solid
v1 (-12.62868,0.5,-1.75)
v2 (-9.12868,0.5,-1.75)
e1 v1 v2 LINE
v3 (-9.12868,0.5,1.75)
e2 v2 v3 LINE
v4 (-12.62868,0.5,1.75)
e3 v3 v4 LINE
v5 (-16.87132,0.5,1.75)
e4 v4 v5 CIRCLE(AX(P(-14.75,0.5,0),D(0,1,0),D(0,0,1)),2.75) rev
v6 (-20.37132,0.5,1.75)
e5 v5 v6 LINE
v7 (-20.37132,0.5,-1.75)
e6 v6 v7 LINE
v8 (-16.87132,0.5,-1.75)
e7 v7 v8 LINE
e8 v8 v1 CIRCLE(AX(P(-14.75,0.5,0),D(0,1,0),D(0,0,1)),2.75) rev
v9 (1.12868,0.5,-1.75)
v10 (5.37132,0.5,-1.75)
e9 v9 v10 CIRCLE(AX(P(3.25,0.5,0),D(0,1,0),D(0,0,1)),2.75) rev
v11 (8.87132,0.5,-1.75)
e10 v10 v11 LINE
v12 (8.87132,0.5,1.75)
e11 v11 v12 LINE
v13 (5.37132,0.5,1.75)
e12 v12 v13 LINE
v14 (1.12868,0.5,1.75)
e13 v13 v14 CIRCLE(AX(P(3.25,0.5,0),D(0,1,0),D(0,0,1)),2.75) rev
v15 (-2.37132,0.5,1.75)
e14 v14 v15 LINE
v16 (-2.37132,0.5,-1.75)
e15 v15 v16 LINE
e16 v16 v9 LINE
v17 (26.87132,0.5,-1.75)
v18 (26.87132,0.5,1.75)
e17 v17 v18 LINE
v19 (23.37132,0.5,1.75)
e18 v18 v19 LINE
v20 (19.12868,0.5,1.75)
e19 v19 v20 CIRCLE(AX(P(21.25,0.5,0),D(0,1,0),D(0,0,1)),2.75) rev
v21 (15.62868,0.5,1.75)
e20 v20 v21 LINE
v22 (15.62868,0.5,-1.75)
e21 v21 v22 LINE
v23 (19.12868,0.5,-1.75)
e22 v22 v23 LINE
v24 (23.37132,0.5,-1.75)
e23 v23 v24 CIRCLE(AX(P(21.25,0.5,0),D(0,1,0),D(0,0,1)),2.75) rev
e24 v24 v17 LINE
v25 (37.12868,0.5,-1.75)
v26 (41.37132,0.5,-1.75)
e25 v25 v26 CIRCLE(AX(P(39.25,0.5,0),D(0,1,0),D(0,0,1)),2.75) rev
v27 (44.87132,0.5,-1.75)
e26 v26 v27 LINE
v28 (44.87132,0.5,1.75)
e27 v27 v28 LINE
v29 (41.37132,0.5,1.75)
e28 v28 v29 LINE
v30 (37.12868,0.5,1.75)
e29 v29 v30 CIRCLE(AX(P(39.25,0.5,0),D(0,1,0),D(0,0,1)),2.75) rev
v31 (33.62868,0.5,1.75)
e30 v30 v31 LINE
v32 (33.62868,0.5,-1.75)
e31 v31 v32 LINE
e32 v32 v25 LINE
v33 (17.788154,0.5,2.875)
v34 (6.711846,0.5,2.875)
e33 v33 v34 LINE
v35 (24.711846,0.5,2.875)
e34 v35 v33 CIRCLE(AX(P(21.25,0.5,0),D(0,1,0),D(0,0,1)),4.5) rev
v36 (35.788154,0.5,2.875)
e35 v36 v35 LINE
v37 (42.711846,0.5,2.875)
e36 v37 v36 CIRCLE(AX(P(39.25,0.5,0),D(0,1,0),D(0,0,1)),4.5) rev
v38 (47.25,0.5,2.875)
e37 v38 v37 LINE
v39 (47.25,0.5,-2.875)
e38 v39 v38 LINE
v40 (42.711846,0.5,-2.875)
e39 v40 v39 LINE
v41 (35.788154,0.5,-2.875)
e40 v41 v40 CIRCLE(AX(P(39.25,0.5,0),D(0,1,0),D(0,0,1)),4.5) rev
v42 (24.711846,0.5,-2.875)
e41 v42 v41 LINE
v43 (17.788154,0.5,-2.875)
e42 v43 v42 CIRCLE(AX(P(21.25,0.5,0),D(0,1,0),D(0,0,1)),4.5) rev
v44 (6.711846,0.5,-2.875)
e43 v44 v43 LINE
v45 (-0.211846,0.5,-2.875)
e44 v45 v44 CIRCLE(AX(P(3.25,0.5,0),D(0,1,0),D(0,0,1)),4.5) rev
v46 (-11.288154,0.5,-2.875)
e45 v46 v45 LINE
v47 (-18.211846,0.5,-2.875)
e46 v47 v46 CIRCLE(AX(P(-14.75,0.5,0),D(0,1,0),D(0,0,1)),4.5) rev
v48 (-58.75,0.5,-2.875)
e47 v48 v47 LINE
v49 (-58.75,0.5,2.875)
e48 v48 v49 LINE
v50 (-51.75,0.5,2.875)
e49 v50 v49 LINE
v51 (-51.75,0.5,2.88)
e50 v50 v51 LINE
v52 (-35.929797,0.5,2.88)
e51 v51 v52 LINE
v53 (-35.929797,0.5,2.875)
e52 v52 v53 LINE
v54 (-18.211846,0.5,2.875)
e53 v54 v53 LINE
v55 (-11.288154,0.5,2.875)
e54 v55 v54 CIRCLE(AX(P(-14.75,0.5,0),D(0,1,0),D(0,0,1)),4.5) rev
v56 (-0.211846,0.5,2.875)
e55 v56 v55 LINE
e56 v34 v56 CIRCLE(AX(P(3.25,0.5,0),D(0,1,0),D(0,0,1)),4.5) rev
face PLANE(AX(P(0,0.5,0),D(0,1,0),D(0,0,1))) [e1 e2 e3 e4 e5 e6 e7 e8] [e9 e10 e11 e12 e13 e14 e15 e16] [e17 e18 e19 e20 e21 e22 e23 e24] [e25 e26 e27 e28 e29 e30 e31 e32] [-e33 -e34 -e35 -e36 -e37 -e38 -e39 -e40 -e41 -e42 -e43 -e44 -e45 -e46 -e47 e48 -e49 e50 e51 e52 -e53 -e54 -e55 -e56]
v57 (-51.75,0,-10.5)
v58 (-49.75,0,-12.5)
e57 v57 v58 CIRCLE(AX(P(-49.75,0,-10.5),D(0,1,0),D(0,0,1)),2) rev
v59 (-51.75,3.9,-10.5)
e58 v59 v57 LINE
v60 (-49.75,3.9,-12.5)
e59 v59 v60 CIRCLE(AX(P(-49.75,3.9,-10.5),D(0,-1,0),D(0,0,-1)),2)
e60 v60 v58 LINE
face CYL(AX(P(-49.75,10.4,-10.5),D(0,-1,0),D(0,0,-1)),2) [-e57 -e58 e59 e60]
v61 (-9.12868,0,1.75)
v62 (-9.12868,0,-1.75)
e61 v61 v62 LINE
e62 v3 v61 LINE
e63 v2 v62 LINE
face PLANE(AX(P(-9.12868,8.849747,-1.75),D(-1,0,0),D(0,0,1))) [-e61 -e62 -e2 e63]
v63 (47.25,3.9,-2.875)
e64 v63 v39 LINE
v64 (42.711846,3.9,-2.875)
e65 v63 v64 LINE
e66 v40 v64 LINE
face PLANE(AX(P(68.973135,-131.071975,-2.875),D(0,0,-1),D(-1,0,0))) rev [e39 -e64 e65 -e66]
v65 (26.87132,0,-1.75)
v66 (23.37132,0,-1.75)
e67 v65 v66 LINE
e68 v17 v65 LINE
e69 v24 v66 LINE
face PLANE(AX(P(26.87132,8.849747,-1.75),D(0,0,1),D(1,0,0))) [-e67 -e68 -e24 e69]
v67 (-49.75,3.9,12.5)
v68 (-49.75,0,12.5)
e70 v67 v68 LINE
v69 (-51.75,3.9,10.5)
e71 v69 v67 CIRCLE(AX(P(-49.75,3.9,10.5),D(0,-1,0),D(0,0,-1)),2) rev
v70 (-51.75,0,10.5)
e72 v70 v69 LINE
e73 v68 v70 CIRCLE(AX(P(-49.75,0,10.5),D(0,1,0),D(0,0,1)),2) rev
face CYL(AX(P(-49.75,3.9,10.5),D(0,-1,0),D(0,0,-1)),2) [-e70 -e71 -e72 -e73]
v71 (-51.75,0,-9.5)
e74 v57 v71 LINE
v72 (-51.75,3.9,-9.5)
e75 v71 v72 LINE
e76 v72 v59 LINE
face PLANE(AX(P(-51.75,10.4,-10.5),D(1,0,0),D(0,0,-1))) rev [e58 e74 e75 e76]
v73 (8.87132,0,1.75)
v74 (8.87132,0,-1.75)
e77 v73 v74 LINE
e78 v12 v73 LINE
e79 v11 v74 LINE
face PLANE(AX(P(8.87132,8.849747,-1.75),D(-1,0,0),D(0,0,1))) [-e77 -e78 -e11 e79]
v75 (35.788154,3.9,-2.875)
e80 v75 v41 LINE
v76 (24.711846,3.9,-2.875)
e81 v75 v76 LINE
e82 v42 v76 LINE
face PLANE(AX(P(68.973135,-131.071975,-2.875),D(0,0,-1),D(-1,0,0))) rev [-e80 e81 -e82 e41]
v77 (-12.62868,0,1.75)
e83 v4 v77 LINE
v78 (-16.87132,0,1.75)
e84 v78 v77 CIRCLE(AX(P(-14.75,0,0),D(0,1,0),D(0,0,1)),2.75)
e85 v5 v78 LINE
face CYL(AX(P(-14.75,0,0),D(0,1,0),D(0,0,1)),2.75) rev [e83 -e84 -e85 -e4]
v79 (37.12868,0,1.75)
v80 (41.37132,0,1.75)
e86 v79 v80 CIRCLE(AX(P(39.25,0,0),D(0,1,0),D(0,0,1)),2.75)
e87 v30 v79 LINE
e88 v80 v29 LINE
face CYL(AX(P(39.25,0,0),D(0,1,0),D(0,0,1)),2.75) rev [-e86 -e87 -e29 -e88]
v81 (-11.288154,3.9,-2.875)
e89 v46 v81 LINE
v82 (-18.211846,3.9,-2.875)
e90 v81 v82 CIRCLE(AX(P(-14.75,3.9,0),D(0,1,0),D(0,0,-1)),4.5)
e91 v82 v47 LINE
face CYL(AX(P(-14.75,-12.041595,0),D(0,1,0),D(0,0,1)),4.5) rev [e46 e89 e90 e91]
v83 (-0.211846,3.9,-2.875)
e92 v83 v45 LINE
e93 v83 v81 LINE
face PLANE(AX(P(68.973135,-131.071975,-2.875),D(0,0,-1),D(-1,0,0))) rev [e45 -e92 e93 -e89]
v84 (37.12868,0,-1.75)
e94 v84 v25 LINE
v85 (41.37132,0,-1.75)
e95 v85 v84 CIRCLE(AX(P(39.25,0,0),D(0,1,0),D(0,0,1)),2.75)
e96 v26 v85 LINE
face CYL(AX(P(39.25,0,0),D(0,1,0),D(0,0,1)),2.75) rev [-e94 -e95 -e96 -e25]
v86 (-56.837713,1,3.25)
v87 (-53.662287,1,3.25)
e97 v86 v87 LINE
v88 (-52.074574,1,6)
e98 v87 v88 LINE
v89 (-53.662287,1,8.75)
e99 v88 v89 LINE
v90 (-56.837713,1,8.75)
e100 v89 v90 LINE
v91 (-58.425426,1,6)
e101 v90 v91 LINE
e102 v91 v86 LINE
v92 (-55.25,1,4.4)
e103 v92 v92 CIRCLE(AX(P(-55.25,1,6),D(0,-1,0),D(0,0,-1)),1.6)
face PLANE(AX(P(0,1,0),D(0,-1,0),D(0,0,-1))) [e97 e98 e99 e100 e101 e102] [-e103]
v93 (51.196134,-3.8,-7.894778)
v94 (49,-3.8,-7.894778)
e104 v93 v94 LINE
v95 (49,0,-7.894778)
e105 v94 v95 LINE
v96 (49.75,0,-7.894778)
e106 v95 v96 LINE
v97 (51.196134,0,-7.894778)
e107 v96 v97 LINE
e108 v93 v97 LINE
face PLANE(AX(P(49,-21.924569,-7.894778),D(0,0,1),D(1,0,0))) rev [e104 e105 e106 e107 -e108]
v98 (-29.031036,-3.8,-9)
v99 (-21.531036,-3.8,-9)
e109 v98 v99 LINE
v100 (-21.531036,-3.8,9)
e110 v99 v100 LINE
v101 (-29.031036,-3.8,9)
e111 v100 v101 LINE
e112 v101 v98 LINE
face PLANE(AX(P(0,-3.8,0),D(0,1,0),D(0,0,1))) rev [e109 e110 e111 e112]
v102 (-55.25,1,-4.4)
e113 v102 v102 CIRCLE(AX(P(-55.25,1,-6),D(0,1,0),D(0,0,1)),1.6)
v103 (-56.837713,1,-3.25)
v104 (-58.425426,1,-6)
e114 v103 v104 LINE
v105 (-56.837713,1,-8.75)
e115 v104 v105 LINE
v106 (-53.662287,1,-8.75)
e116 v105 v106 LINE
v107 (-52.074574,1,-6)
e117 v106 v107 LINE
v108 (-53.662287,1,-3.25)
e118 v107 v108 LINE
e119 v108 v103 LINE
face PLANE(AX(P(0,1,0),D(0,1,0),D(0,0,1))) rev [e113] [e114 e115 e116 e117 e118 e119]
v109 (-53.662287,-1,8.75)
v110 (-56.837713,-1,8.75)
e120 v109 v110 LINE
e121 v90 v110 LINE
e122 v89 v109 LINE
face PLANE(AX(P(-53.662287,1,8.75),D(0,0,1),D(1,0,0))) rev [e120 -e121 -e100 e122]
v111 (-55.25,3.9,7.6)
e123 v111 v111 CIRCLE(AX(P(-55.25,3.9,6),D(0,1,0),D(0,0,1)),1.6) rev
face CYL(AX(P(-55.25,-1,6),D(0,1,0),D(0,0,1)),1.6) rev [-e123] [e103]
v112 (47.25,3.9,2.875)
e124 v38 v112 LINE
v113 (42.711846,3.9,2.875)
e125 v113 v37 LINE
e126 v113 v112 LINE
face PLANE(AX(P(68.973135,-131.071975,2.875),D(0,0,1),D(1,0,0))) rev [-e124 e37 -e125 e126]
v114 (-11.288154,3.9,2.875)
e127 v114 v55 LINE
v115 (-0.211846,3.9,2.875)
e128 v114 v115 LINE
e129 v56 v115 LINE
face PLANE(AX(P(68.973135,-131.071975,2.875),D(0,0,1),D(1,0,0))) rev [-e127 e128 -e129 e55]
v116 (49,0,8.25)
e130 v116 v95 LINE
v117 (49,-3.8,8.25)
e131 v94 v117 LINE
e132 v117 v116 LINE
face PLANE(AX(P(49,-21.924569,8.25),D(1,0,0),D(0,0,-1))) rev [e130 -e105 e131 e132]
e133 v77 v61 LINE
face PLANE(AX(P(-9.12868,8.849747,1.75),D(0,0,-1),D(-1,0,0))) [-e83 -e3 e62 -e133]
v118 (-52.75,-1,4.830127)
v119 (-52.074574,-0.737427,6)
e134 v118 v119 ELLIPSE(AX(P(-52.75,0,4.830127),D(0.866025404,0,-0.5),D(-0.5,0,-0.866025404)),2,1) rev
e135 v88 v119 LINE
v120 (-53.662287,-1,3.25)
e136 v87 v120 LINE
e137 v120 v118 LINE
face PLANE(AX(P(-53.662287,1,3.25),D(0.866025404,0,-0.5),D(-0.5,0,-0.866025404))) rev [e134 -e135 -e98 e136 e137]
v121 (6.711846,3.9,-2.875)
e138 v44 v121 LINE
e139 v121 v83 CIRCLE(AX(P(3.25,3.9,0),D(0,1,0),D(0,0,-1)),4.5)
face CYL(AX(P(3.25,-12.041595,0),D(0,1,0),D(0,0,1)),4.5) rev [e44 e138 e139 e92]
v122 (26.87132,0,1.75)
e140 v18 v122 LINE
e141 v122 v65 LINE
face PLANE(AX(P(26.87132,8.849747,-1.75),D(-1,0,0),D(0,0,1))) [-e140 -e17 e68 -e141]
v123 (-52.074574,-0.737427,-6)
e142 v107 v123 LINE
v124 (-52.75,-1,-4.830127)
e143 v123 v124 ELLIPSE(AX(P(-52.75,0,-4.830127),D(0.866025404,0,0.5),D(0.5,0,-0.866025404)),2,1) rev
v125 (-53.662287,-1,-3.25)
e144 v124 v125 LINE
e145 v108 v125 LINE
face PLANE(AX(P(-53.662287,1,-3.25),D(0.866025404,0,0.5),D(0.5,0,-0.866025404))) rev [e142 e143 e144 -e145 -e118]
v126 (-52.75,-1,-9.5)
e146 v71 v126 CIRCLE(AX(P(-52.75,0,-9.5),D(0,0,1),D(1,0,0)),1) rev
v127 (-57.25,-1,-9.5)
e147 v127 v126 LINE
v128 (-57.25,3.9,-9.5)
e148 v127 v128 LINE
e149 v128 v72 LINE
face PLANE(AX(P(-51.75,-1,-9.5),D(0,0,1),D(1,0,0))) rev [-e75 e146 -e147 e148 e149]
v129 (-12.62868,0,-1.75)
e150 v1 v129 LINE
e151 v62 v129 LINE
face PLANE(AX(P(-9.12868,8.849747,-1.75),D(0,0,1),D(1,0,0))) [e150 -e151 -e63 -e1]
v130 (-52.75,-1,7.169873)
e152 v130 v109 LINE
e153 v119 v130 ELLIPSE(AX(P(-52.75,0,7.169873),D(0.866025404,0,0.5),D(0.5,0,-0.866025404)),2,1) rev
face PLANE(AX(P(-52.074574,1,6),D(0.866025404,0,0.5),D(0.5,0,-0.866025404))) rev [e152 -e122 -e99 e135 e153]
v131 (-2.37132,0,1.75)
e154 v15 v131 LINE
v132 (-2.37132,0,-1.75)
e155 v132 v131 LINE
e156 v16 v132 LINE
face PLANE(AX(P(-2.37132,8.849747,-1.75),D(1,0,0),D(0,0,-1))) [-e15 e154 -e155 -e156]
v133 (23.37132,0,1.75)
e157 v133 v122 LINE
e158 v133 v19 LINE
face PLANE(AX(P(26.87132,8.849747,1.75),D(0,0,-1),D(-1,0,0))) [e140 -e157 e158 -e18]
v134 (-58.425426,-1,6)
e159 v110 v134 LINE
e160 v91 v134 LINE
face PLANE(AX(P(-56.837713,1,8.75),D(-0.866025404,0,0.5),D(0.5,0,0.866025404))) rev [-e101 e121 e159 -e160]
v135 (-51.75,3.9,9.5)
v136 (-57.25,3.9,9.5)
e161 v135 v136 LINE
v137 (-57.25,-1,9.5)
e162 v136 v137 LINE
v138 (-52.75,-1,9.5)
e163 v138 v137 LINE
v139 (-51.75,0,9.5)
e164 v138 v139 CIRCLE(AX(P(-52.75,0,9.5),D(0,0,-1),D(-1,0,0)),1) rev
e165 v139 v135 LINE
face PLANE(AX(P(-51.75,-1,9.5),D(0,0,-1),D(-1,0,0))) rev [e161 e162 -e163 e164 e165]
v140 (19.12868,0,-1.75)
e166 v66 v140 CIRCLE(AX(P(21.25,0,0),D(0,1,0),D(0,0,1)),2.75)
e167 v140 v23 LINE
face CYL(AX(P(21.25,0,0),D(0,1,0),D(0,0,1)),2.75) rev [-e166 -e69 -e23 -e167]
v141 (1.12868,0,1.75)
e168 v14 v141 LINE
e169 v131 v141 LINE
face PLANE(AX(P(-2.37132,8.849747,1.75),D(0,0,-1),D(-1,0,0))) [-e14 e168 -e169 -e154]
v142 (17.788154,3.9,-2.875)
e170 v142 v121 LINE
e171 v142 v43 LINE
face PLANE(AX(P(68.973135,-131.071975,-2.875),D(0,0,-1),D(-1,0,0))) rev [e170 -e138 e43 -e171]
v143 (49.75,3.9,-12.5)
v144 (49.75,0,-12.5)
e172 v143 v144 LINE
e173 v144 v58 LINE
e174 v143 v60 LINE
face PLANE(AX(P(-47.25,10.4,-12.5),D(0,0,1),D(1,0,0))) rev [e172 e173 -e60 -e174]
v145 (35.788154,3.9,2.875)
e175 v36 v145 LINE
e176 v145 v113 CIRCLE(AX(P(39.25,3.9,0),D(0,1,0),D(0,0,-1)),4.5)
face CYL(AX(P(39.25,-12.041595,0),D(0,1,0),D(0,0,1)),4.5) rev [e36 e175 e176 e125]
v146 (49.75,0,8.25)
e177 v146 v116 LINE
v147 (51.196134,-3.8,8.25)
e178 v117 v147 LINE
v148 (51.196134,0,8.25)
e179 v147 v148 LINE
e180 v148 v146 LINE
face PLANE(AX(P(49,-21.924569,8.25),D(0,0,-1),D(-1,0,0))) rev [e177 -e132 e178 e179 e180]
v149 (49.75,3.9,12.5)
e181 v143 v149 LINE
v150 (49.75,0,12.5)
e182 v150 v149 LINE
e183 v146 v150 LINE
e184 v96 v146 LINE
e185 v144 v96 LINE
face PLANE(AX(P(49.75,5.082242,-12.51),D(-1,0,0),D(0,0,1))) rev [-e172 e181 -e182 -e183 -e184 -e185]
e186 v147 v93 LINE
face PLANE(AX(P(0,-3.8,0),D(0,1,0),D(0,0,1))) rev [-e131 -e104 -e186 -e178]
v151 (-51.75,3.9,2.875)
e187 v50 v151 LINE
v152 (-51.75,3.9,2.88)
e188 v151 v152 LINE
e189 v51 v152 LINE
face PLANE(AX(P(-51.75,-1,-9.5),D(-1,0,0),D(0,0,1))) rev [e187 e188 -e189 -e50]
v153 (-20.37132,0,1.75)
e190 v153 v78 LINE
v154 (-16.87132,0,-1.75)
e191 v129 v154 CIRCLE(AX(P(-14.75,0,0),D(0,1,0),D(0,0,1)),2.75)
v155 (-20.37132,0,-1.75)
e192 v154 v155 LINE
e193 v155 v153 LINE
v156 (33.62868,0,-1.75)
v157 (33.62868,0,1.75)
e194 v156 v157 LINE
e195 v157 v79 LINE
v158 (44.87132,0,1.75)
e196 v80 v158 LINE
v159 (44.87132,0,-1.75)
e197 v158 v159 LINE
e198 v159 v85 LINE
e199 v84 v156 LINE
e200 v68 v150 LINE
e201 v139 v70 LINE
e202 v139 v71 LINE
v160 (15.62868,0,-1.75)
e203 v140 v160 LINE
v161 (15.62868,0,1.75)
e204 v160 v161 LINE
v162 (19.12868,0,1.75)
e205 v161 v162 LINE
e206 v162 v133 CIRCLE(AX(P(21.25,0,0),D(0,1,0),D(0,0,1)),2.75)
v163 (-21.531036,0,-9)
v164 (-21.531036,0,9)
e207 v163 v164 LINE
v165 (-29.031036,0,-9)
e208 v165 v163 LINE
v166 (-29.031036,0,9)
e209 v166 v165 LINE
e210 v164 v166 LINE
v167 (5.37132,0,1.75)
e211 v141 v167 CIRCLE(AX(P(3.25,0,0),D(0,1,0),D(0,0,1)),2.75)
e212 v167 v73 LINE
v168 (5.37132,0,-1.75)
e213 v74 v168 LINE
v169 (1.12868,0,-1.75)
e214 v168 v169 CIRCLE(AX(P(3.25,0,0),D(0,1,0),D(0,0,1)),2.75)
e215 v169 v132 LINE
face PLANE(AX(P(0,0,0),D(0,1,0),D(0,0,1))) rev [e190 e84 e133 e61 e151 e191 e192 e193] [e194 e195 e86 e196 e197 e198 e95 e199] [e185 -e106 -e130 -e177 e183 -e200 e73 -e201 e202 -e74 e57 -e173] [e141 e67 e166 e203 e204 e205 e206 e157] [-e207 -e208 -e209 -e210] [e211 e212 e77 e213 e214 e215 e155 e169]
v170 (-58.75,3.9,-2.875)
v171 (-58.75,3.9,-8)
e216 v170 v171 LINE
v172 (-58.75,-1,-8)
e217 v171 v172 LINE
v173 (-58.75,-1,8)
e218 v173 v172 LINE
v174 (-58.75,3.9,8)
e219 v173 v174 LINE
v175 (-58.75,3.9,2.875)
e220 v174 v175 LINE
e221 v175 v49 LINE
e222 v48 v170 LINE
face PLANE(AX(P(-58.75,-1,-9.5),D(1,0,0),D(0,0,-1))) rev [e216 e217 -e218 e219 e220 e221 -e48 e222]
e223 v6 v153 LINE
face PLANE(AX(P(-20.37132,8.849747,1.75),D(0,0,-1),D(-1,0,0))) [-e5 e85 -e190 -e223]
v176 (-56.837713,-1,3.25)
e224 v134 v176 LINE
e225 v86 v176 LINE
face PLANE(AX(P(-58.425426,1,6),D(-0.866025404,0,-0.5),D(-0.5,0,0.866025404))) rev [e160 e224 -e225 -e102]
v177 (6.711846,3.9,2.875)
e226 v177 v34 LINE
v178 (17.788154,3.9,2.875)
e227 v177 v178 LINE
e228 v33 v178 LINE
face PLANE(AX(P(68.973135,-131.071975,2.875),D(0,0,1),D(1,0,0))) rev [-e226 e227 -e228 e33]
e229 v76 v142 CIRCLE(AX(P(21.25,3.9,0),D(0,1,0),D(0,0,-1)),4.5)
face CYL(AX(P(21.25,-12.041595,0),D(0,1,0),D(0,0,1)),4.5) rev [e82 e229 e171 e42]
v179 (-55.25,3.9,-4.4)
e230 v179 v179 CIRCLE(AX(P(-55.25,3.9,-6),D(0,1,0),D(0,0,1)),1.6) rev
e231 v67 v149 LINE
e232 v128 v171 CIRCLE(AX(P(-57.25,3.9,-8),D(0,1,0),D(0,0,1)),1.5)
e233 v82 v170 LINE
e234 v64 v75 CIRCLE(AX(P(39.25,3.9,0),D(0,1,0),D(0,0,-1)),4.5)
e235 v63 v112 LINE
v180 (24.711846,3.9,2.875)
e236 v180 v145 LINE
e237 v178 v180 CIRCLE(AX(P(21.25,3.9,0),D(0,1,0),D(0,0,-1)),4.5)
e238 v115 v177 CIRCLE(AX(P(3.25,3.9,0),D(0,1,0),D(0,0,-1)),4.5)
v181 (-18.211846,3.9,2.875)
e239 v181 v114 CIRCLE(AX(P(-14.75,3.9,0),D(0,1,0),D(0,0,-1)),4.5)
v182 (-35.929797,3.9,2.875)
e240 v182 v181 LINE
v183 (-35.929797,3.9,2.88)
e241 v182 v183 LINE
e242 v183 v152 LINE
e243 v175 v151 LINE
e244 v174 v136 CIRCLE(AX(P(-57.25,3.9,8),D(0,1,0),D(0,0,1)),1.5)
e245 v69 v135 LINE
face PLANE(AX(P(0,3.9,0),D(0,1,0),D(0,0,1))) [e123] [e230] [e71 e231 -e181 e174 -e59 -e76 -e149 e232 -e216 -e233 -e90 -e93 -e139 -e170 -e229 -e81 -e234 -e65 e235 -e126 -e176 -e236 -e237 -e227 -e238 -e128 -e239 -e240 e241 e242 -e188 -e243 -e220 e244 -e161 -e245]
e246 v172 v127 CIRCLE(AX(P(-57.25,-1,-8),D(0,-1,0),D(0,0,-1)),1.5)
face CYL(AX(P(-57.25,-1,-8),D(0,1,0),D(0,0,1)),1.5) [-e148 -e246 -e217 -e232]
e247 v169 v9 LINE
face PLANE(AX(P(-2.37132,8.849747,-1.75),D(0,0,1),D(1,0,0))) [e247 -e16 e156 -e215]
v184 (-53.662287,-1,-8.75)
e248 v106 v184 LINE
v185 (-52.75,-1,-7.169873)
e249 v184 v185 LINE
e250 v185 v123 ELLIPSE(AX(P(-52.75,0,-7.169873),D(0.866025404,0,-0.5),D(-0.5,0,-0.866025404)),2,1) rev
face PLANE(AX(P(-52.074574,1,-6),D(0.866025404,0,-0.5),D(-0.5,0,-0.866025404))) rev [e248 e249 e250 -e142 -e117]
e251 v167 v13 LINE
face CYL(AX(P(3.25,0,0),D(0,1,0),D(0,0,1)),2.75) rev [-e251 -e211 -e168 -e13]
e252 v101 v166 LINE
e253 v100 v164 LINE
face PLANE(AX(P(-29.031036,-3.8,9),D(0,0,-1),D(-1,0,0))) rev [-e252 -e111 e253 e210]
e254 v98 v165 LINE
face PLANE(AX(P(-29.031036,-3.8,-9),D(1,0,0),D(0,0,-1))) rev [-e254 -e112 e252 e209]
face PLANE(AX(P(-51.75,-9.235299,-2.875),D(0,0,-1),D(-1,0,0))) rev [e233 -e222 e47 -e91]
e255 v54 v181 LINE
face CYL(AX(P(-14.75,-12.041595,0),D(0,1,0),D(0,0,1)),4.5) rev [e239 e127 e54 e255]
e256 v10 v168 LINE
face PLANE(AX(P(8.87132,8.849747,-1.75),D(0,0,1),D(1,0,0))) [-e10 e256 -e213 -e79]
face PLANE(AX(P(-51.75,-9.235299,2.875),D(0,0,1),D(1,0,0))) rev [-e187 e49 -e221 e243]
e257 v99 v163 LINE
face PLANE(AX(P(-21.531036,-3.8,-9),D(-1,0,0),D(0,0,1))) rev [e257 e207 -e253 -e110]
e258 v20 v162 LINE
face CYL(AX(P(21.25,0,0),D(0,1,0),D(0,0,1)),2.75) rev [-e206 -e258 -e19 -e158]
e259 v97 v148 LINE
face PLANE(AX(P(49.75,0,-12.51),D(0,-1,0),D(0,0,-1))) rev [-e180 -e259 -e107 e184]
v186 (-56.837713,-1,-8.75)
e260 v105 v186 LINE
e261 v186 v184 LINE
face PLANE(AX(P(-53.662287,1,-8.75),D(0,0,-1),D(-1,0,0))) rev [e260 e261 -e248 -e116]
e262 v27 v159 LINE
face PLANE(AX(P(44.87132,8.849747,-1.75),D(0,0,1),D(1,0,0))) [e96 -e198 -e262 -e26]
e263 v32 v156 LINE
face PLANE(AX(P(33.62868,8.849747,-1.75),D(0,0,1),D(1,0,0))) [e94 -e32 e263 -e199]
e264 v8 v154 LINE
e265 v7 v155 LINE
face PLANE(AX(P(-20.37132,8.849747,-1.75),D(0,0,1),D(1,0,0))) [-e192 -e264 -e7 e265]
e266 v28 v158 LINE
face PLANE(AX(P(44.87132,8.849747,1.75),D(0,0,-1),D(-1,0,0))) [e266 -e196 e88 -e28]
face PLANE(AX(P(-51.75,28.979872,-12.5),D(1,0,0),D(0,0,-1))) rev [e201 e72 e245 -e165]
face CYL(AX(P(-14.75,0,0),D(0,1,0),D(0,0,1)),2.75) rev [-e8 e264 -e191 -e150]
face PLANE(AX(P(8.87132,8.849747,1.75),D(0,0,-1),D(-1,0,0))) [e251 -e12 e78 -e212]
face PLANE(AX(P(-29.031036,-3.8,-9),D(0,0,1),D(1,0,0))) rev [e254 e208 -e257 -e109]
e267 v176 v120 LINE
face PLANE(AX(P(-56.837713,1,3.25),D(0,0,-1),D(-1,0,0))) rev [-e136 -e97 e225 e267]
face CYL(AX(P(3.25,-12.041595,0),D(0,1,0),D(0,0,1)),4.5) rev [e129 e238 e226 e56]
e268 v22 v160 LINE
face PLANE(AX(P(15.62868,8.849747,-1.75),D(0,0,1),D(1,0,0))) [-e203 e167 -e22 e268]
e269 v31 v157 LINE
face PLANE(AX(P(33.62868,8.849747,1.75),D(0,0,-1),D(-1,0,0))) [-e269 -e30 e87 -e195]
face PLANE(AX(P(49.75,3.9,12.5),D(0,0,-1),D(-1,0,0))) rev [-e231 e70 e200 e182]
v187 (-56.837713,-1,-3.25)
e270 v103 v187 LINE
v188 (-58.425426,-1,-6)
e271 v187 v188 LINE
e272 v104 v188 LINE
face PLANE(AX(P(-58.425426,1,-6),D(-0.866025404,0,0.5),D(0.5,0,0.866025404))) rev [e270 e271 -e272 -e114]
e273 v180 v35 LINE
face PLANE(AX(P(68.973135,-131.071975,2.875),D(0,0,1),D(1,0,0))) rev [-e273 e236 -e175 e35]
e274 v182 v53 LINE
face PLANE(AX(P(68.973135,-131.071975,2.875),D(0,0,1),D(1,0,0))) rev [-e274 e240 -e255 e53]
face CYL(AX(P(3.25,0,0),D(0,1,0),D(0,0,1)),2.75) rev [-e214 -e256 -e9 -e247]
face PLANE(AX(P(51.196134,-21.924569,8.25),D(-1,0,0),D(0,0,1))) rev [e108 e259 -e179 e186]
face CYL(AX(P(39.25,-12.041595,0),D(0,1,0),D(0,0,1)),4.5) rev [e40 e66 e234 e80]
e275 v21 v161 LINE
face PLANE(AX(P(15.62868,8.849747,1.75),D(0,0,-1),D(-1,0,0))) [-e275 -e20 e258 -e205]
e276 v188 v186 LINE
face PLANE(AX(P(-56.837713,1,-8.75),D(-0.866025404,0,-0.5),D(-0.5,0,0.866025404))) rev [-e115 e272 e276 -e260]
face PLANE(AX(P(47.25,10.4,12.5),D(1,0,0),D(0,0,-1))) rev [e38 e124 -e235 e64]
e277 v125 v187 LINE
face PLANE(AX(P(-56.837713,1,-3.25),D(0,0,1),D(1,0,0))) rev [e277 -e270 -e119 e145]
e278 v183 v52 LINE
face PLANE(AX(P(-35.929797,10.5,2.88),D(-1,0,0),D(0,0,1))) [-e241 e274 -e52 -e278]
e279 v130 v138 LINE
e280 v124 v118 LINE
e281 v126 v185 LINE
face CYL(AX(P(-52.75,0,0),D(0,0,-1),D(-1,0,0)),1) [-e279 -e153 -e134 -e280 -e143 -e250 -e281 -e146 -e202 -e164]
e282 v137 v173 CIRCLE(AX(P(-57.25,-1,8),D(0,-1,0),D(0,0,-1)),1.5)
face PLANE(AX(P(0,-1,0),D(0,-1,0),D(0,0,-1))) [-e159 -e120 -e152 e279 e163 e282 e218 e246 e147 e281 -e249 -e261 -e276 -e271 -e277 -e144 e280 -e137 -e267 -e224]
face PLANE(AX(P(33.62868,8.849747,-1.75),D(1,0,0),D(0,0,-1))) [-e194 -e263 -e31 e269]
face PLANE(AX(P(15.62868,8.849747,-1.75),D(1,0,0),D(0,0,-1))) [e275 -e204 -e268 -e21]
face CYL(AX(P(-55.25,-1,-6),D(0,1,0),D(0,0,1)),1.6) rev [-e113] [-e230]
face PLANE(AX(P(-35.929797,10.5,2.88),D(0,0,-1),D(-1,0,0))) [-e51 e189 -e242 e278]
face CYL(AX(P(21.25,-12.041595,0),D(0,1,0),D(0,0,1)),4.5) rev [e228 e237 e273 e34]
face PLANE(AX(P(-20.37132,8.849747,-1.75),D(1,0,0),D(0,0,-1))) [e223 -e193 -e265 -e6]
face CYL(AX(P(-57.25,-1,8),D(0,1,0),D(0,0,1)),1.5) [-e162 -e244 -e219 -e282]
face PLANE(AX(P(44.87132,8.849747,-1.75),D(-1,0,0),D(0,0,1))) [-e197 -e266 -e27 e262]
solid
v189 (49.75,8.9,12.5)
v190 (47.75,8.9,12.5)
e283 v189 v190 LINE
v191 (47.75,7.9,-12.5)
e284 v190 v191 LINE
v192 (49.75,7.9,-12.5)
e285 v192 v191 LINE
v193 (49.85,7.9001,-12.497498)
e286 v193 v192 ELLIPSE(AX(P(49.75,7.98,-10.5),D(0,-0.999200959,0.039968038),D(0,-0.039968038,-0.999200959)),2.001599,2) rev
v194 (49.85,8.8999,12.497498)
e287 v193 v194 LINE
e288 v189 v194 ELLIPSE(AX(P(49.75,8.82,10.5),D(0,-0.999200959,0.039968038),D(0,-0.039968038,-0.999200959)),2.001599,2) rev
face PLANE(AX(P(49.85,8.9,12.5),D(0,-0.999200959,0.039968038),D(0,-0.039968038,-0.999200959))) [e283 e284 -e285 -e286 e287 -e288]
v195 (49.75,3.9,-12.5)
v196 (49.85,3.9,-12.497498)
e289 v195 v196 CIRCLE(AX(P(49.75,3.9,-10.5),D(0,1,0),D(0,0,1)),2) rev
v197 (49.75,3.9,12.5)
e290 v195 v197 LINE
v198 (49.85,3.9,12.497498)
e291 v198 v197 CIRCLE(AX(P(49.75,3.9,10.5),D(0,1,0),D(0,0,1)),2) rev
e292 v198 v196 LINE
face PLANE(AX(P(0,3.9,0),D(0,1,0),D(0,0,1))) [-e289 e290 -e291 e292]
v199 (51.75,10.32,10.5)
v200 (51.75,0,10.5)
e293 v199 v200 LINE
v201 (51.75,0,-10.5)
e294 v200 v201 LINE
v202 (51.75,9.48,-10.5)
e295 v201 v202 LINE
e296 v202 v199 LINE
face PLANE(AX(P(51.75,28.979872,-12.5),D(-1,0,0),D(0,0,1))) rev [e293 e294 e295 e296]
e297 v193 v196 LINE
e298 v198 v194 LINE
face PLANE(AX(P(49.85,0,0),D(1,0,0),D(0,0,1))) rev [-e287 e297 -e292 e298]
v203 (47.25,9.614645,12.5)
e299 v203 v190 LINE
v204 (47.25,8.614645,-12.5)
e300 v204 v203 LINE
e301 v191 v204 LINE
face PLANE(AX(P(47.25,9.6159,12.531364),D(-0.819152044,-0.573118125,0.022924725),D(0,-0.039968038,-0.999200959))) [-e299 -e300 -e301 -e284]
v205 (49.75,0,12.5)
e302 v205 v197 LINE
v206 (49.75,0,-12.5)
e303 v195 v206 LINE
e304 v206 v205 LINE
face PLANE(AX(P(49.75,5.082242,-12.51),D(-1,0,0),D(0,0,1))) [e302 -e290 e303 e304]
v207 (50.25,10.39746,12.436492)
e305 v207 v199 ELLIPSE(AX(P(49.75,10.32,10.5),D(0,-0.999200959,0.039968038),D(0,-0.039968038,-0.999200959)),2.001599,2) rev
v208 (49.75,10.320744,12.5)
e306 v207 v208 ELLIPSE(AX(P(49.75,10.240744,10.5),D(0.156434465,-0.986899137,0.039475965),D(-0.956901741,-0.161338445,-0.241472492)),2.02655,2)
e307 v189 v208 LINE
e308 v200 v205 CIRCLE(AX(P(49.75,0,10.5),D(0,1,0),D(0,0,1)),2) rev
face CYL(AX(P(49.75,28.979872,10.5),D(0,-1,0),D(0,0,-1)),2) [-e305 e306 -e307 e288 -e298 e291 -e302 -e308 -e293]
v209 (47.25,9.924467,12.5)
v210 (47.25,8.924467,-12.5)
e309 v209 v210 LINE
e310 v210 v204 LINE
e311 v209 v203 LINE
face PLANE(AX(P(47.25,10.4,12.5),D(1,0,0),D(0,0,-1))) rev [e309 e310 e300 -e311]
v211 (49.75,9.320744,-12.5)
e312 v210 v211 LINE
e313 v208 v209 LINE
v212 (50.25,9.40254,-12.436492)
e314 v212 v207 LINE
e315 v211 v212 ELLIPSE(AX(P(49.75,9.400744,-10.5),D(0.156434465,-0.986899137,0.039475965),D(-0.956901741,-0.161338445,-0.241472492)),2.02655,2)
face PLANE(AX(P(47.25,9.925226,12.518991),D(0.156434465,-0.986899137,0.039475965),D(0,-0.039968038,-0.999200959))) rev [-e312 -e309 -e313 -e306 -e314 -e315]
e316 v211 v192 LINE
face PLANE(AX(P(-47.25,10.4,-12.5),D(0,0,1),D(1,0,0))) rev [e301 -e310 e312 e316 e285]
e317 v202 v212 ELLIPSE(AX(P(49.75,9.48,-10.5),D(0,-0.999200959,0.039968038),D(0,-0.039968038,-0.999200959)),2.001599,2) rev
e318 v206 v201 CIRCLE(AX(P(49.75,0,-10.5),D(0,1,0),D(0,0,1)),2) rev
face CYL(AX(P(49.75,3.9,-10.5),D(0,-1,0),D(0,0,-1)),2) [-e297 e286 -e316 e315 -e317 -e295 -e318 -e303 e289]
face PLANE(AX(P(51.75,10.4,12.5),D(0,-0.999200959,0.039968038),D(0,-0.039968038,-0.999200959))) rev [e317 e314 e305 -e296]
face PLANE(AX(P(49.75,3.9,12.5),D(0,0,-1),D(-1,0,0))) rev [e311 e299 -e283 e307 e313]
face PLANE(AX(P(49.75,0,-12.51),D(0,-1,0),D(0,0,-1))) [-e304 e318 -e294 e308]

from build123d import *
from OCP.BRepFilletAPI import BRepFilletAPI_MakeChamfer

# Parameters (mm, degrees)
SKETCH1_W                = 99.5
SKETCH1_H                = 25
BOSS_EXTRUDE1_DEPTH      = 3.9
SKETCH2_R                = 2.75
CUT_EXTRUDE1_DEPTH       = 52.444363151
SKETCH4_W                = 2
SKETCH4_H                = 25
BOSS_EXTRUDE2_DEPTH      = 3.9
SNAP_START               = -51.12804878
SNAP_HOOK1_DEPTH         = 1.37804878
SNAP_START_2             = -10.052407779
SNAP_HOOK1_2_DEPTH       = 20.104815558
SNAP_START_3             = -10.267279674
SNAP_HOOK1_3_DEPTH       = 20.534559348
SNAP_START_4             = -53
SNAP_HOOK1_4_DEPTH       = 5
CUT_EXTRUDE2_DEPTH       = 3.4
SKETCH6_W                = 131.446270808
SKETCH6_H                = 5.75
CUT_EXTRUDE3_DEPTH       = 3.4
FILLET3_R                = 2
SKETCH12_W               = 3.5
SKETCH12_H               = 3.5
CUT_EXTRUDE8_DEPTH       = 3.9
SKETCH13_W               = 19.63116991
SKETCH13_H               = 5.75
CUT_EXTRUDE9_DEPTH       = 10
BOSS_EXTRUDE8_DEPTH      = 1
BOSS_EXTRUDE8_DEPTH_BACK = 3.9
SKETCH15_W               = 7
SKETCH15_H               = 19
SKETCH15_R               = 1.6
CUT_EXTRUDE10_DEPTH      = 2
SKETCH17_W               = 7.226910769
SKETCH17_H               = 5.75
CUT_EXTRUDE11_DEPTH      = 3.4
FILLET6_R                = 1.5
SKETCH18_W               = 7.5
SKETCH18_H               = 18
BOSS_EXTRUDE9_DEPTH      = 3.8
SKETCH21_W               = 7.5
SKETCH21_H               = 16.5
SKETCH21_W_2             = 2.196133812
SKETCH21_H_2             = 16.144777587
BOSS_EXTRUDE11_DEPTH     = 3.8
FILLET7_R                = 1
SKETCH22_W               = 5.52852217
SKETCH22_H               = 24.476704992
SKETCH22_W_2             = 17.032273736
SKETCH22_H_2             = 39.798184175
CUT_EXTRUDE14_DEPTH      = 5.1
BOSS_EXTRUDE12_START     = 9.9
BOSS_EXTRUDE12_DEPTH     = 9.9
CUT_EXTRUDE15_DEPTH      = 2.6
CUT_EXTRUDE16_DEPTH      = 105.769556647
CHAMFER1_SIZE            = 3
CHAMFER1_SIZE2           = 0.475153321
CHAMFER2_SIZE            = 0.5
CHAMFER2_SIZE2           = 0.714074003
SKETCH28_W               = 5.417071425
SKETCH28_H               = 25.110658167
CUT_EXTRUDE18_DEPTH      = 61.55660575
SPLIT1_SURFACE_1_BACK    = 115.179
SPLIT1_SURFACE_1_DEPTH   = 230.358
SPLIT1_SURFACE_2_BACK    = 115.179
SPLIT1_SURFACE_2_DEPTH   = 230.358


with BuildPart() as part:
    # Sketch1 → Boss-Extrude1 (new body)
    with BuildSketch(Plane(origin=(0, 0, 0), x_dir=(1, 0, 0), z_dir=(0, 1, 0))):
        Rectangle(SKETCH1_W, SKETCH1_H)
    extrude(amount=BOSS_EXTRUDE1_DEPTH)

    # Sketch2 → Cut-Extrude1 (cut, through all)
    with BuildSketch(Plane(origin=(0, 3.9, 0), x_dir=(1, 0, 0), z_dir=(0, 1, 0))):
        with Locations(Location((-14.75, 0, 0), (0, 0, 270))):
            Circle(SKETCH2_R)
        with Locations(Location((3.25, 0, 0), (0, 0, 270))):
            Circle(SKETCH2_R)
        with Locations(Location((21.25, 0, 0), (0, 0, 270))):
            Circle(SKETCH2_R)
        with Locations(Location((39.25, 0, 0), (0, 0, 270))):
            Circle(SKETCH2_R)
    extrude(amount=-CUT_EXTRUDE1_DEPTH, mode=Mode.SUBTRACT)

    # Sketch4 → Boss-Extrude2 (add)
    with BuildSketch(Plane(origin=(0, 0, 0), x_dir=(1, 0, 0), z_dir=(0, 1, 0))):
        with Locations((-50.75, 0)):
            Rectangle(SKETCH4_W, SKETCH4_H)
        with Locations((50.75, 0)):
            Rectangle(SKETCH4_W, SKETCH4_H)
    extrude(amount=BOSS_EXTRUDE2_DEPTH)

    # Snap Hook1: read off the stored shape, not the designer's step
    # Snap Hook1 outline → Snap Hook1 (add)
    with BuildSketch(Plane.YZ.offset(SNAP_START)):
        Polygon((9, -10), (9, 10), (3.9, 10.267279674), (3.9, -10.267279674), align=None)
    snap_hook1 = extrude(amount=SNAP_HOOK1_DEPTH)

    # Snap Hook1 2 outline → Snap Hook1 2 (add)
    with BuildSketch(Plane.XY.offset(SNAP_START_2)):
        Polygon((-51.12804878, 3.9), (-51.12804878, 9), (-51.75, 3.9), align=None)
        Polygon((-49.75, 9), (-49.75, 8), (-48.75, 8), (-48.75, 8.5), align=None)
    snap_hook1_2 = extrude(amount=SNAP_HOOK1_2_DEPTH)

    # Snap Hook1 3 outline → Snap Hook1 3 (add)
    with BuildSketch(Plane.XY.offset(SNAP_START_3)):
        Polygon((-51.12804878, 3.9), (-51.12804878, 9), (-51.75, 3.9), align=None)
    snap_hook1_3 = extrude(amount=SNAP_HOOK1_3_DEPTH)

    # Snap Hook1 4 outline → Snap Hook1 4 (cut)
    with BuildSketch(Plane.YZ.offset(SNAP_START_4)):
        Polygon((9, 10), (10, 9.947592221), (10, 10.267279674), (3.9, 10.267279674), align=None)
        Polygon((10, -9.947592221), (9, -10), (3.9, -10.267279674), (10, -10.267279674), align=None)
    snap_hook1_4 = extrude(amount=SNAP_HOOK1_4_DEPTH, mode=Mode.SUBTRACT)

    # Mirror1: Snap Hook1, Snap Hook1 2, Snap Hook1 3, Snap Hook1 4 across plane
    add(snap_hook1.mirror(Plane(origin=(0, 0, 0), x_dir=(0, 0, 1), z_dir=(1, 0, 0))))
    add(snap_hook1_2.mirror(Plane(origin=(0, 0, 0), x_dir=(0, 0, 1), z_dir=(1, 0, 0))))
    add(snap_hook1_3.mirror(Plane(origin=(0, 0, 0), x_dir=(0, 0, 1), z_dir=(1, 0, 0))))
    add(snap_hook1_4.mirror(Plane(origin=(0, 0, 0), x_dir=(0, 0, 1), z_dir=(1, 0, 0))), mode=Mode.SUBTRACT)

    # Sketch5 → Cut-Extrude2 (cut)
    with BuildSketch(Plane(origin=(0, 3.9, 0), x_dir=(1, 0, 0), z_dir=(0, 1, 0))):
        with BuildLine():
            Line((-18.75, 2.061552813), (-18.75, -2.061552813))
            ThreePointArc((-18.75, -2.061552813), (-14.75, -4.5), (-10.75, -2.061552813))
            Line((-10.75, -2.061552813), (-10.75, 2.061552813))
            ThreePointArc((-10.75, 2.061552813), (-14.75, 4.5), (-18.75, 2.061552813))
        make_face()
        with BuildLine():
            Line((-0.75, 2.061552813), (-0.75, -2.061552813))
            ThreePointArc((-0.75, -2.061552813), (3.25, -4.5), (7.25, -2.061552813))
            Line((7.25, -2.061552813), (7.25, 2.061552813))
            ThreePointArc((7.25, 2.061552813), (3.25, 4.5), (-0.75, 2.061552813))
        make_face()
        with BuildLine():
            Line((17.25, 2.061552813), (17.25, -2.061552813))
            ThreePointArc((17.25, -2.061552813), (21.25, -4.5), (25.25, -2.061552813))
            Line((25.25, -2.061552813), (25.25, 2.061552813))
            ThreePointArc((25.25, 2.061552813), (21.25, 4.5), (17.25, 2.061552813))
        make_face()
        with BuildLine():
            Line((35.25, 2.061552813), (35.25, -2.061552813))
            ThreePointArc((35.25, -2.061552813), (39.25, -4.5), (43.25, -2.061552813))
            Line((43.25, -2.061552813), (43.25, 2.061552813))
            ThreePointArc((43.25, 2.061552813), (39.25, 4.5), (35.25, 2.061552813))
        make_face()
    extrude(amount=-CUT_EXTRUDE2_DEPTH, mode=Mode.SUBTRACT)

    # Sketch6 → Cut-Extrude3 (cut)
    with BuildSketch(Plane(origin=(0, 3.9, 0), x_dir=(1, 0, 0), z_dir=(0, 1, 0))):
        with Locations((3.25, 0)):
            Rectangle(SKETCH6_W, SKETCH6_H)
    extrude(amount=-CUT_EXTRUDE3_DEPTH, mode=Mode.SUBTRACT)

    # Fillet3
    fillet3_edges = [part.edges().sort_by_distance(p)[0] for p in [
        (-51.75, 1.95, -12.5),
        (-51.75, 1.95, 12.5),
        (51.75, 1.95, 12.5),
        (51.75, 1.95, -12.5),
    ]]
    fillet(fillet3_edges, radius=FILLET3_R)

    # Sketch12 → Cut-Extrude8 (cut)
    with BuildSketch(Plane(origin=(0, 0, 0), x_dir=(1, 0, 0), z_dir=(0, 1, 0))):
        with Locations((-10.878679656, 0)):
            Rectangle(SKETCH12_W, SKETCH12_H)
        with Locations((-18.621320344, 0)):
            Rectangle(SKETCH12_W, SKETCH12_H)
        with Locations((7.121320344, 0)):
            Rectangle(SKETCH12_W, SKETCH12_H)
        with Locations((-0.621320344, 0)):
            Rectangle(SKETCH12_W, SKETCH12_H)
        with Locations((25.121320344, 0)):
            Rectangle(SKETCH12_W, SKETCH12_H)
        with Locations((17.378679656, 0)):
            Rectangle(SKETCH12_W, SKETCH12_H)
        with Locations((43.121320344, 0)):
            Rectangle(SKETCH12_W, SKETCH12_H)
        with Locations((35.378679656, 0)):
            Rectangle(SKETCH12_W, SKETCH12_H)
    extrude(amount=CUT_EXTRUDE8_DEPTH, mode=Mode.SUBTRACT)

    # Sketch13 → Cut-Extrude9 (cut)
    with BuildSketch(Plane(origin=(0, 0.5, 0), x_dir=(1, 0, 0), z_dir=(0, 1, 0))):
        with Locations((-45.74538215, -0.005)):
            Rectangle(SKETCH13_W, SKETCH13_H)
    extrude(amount=CUT_EXTRUDE9_DEPTH, mode=Mode.SUBTRACT)

    # Sketch18 → Boss-Extrude9 (add)
    with BuildSketch(Plane(origin=(0, 0, 0), x_dir=(-1, 0, 0), z_dir=(0, -1, 0))):
        with Locations((25.281035949, 0)):
            Rectangle(SKETCH18_W, SKETCH18_H)
    extrude(amount=BOSS_EXTRUDE9_DEPTH)

    # Sketch21 → Boss-Extrude11 (add)
    with BuildSketch(Plane.XZ):
        with Locations((-25.281035949, 0)):
            Rectangle(SKETCH21_W, SKETCH21_H)
        with Locations((50.098066906, 0.177611206)):
            Rectangle(SKETCH21_W_2, SKETCH21_H_2)
    extrude(amount=BOSS_EXTRUDE11_DEPTH)

    # Sketch22 → Cut-Extrude14 (cut)
    with BuildSketch(Plane(origin=(0, 3.9, 0), x_dir=(1, 0, 0), z_dir=(0, 1, 0))):
        with Locations((-50.419989223, -0.434704532)):
            Rectangle(SKETCH22_W, SKETCH22_H)
        with Locations((49.214622504, 0.682711118)):
            Rectangle(SKETCH22_W_2, SKETCH22_H_2)
    extrude(amount=CUT_EXTRUDE14_DEPTH, mode=Mode.SUBTRACT)



with BuildPart() as body_2:
    # Sketch15 → Boss-Extrude8 (new, two sides: drawn at the far end of the back side and taken through both)
    with BuildSketch(Plane.XZ.offset(-BOSS_EXTRUDE8_DEPTH_BACK)):
        with Locations((-55.25, 0)):
            Rectangle(SKETCH15_W, SKETCH15_H)
        with Locations(Location((-55.25, -6, 0), (0, 0, 90))):
            Circle(SKETCH15_R, mode=Mode.SUBTRACT)
        with Locations(Location((-55.25, 6, 0), (0, 0, 90))):
            Circle(SKETCH15_R, mode=Mode.SUBTRACT)
    extrude(amount=BOSS_EXTRUDE8_DEPTH + BOSS_EXTRUDE8_DEPTH_BACK)

    # Sketch16 → Cut-Extrude10 (cut)
    with BuildSketch(Plane(origin=(0, -1, 0), x_dir=(-1, 0, 0), z_dir=(0, -1, 0))):
        Polygon((56.83771324, -8.75), (58.425426481, -6), (56.83771324, -3.25), (53.66228676, -3.25), (52.074573519, -6), (53.66228676, -8.75), align=None)
        Polygon((53.66228676, 8.75), (56.83771324, 8.75), (58.425426481, 6), (56.83771324, 3.25), (53.66228676, 3.25), (52.074573519, 6), align=None)
    extrude(amount=-CUT_EXTRUDE10_DEPTH, mode=Mode.SUBTRACT)

    # Sketch17 → Cut-Extrude11 (cut)
    with BuildSketch(Plane(origin=(0, 3.9, 0), x_dir=(1, 0, 0), z_dir=(0, 1, 0))):
        with Locations((-55.363455384, 0)):
            Rectangle(SKETCH17_W, SKETCH17_H)
    extrude(amount=-CUT_EXTRUDE11_DEPTH, mode=Mode.SUBTRACT)

    # Fillet6
    fillet6_edges = [body_2.edges().sort_by_distance(p)[0] for p in [
        (-58.75, 1.45, -9.5),
        (-58.75, 1.45, 9.5),
    ]]
    fillet(fillet6_edges, radius=FILLET6_R)

    # Fillet7
    # the kernel refuses this fillet: 1 mm, written as the material it takes off along each edge
    with BuildSketch(Plane(origin=(-51.75, -1, 12), x_dir=(-1, 0, 0), z_dir=(0, 0, -1))) as fillet7_piece_1:
        with BuildLine():
            CenterArc((FILLET7_R, FILLET7_R), FILLET7_R, 180, 90)
            Line((0, FILLET7_R), (0, 0))
            Line((0, 0), (FILLET7_R, 0))
        make_face()
    extrude(amount=24, mode=Mode.SUBTRACT)


with BuildPart() as part_1:
    add(part.part)

    add(body_2.part)  # Boss-Extrude12 merges body 2
    # Sketch23 → Boss-Extrude12 (add)
    with BuildSketch(Plane(origin=(0, 0.5, 0), x_dir=(1, 0, 0), z_dir=(0, 1, 0)).offset(BOSS_EXTRUDE12_START)):
        with BuildLine():
            Line((-47.25, 12.5), (-49.75, 12.5))
            ThreePointArc((-49.75, 12.5), (-51.164213562, 11.914213562), (-51.75, 10.5))
            Line((-51.75, 10.5), (-51.75, 3.546980625))
            Line((-51.75, 3.546980625), (-47.25, 3.546980625))
            Line((-47.25, 3.546980625), (-47.25, 12.5))
        make_face()
        with BuildLine():
            Line((-51.75, -10.5), (-51.75, -3.546980625))
            Line((-51.75, -3.546980625), (-47.25, -3.546980625))
            Line((-47.25, -3.546980625), (-47.25, -12.5))
            Line((-47.25, -12.5), (-49.75, -12.5))
            ThreePointArc((-49.75, -12.5), (-51.164213562, -11.914213562), (-51.75, -10.5))
        make_face()
        with BuildLine():
            Line((47.25, -12.5), (49.75, -12.5))
            ThreePointArc((49.75, -12.5), (51.164213562, -11.914213562), (51.75, -10.5))
            Line((51.75, -10.5), (51.75, -3.546980625))
            Line((51.75, -3.546980625), (51.75, 3.546980625))
            Line((51.75, 3.546980625), (51.75, 10.5))
            ThreePointArc((51.75, 10.5), (51.164213562, 11.914213562), (49.75, 12.5))
            Line((49.75, 12.5), (47.25, 12.5))
            Line((47.25, 12.5), (47.25, 3.546980625))
            Line((47.25, 3.546980625), (47.25, -3.546980625))
            Line((47.25, -3.546980625), (47.25, -12.5))
        make_face()
    extrude(amount=-BOSS_EXTRUDE12_DEPTH)

    # Sketch24 → Cut-Extrude15 (cut)
    with BuildSketch(Plane(origin=(-47.25, 0, 0), x_dir=(0, 0, -1), z_dir=(1, 0, 0))):
        Polygon((12.5, 3.9), (-12.5, 3.9), (-12.5, 8.9), (12.5, 7.9), align=None)
    cut_extrude15 = extrude(amount=-CUT_EXTRUDE15_DEPTH, mode=Mode.SUBTRACT)

    # Mirror2: Cut-Extrude15 across plane
    add(cut_extrude15.mirror(Plane(origin=(0, 0, 0), x_dir=(0, 0, 1), z_dir=(1, 0, 0))), mode=Mode.SUBTRACT)

    # Sketch25 → Cut-Extrude16 (cut, through all)
    with BuildSketch(Plane.ZY.offset(51.75)):
        Polygon((12.5, 10.4), (-15.116009289, 9.295359628), (-15.116009289, 13.641996299), (12.5, 13.641996299), align=None)
    extrude(amount=-CUT_EXTRUDE16_DEPTH, mode=Mode.SUBTRACT)

    # Chamfer1: one chamfer whose edges measure the first distance from different faces: ONE call of the kernel's chamfer builder (chamfer() names one face for all edges)
    chamfer1_edges_1 = [part_1.edges().sort_by_distance(p)[0] for p in [
        (47.25, 9.9, 0),
    ]]
    chamfer1_side_1 = [part_1.faces().sort_by_distance(p)[0] for p in [
        (49.472054691, 9.9, 0),
    ]]
    chamfer1_edges_2 = [part_1.edges().sort_by_distance(p)[0] for p in [
        (-47.25, 9.579060387, -8.023490313),
    ]]
    chamfer1_side_2 = [part_1.faces().sort_by_distance(p)[0] for p in [
        (-49.460742376, 9.582569565, -7.935760876),
    ]]
    chamfer1_edges_3 = [part_1.edges().sort_by_distance(p)[0] for p in [
        (-47.25, 10.220939613, 8.023490313),
    ]]
    chamfer1_side_3 = [part_1.faces().sort_by_distance(p)[0] for p in [
        (-49.460742376, 10.217430435, 7.935760876),
    ]]
    chamfer1 = BRepFilletAPI_MakeChamfer(part_1.part.solid().wrapped)
    for e in chamfer1_edges_1:
        chamfer1.Add(CHAMFER1_SIZE, CHAMFER1_SIZE2, e.wrapped, chamfer1_side_1[0].wrapped)  # the first distance lies on this face
    for e in chamfer1_edges_2:
        chamfer1.Add(CHAMFER1_SIZE, CHAMFER1_SIZE2, e.wrapped, chamfer1_side_2[0].wrapped)  # the first distance lies on this face
    for e in chamfer1_edges_3:
        chamfer1.Add(CHAMFER1_SIZE, CHAMFER1_SIZE2, e.wrapped, chamfer1_side_3[0].wrapped)  # the first distance lies on this face
    add(Compound.cast(chamfer1.Shape()), mode=Mode.REPLACE)

    # Chamfer2: one chamfer whose edges measure the first distance from different faces: ONE call of the kernel's chamfer builder (chamfer() names one face for all edges)
    chamfer2_edges_1 = [part_1.edges().sort_by_distance(p)[0] for p in [
        (-47.25, 8.079060387, -8.023490313),
    ]]
    chamfer2_side_1 = [part_1.faces().sort_by_distance(p)[0] for p in [
        (-47.25, 8.591293742, -8.023490313),
    ]]
    chamfer2_edges_2 = [part_1.edges().sort_by_distance(p)[0] for p in [
        (-47.25, 8.720939613, 8.023490313),
    ]]
    chamfer2_side_2 = [part_1.faces().sort_by_distance(p)[0] for p in [
        (-47.25, 9.233172967, 8.023490313),
    ]]
    chamfer2_edges_3 = [part_1.edges().sort_by_distance(p)[0] for p in [
        (47.25, 8.4, 0),
    ]]
    chamfer2_side_3 = [part_1.faces().sort_by_distance(p)[0] for p in [
        (48.54999673, 8.4, 0),
    ]]
    chamfer2 = BRepFilletAPI_MakeChamfer(part_1.part.solid().wrapped)
    for e in chamfer2_edges_1:
        chamfer2.Add(CHAMFER2_SIZE, CHAMFER2_SIZE2, e.wrapped, chamfer2_side_1[0].wrapped)  # the first distance lies on this face
    for e in chamfer2_edges_2:
        chamfer2.Add(CHAMFER2_SIZE, CHAMFER2_SIZE2, e.wrapped, chamfer2_side_2[0].wrapped)  # the first distance lies on this face
    for e in chamfer2_edges_3:
        chamfer2.Add(CHAMFER2_SIZE, CHAMFER2_SIZE2, e.wrapped, chamfer2_side_3[0].wrapped)  # the first distance lies on this face
    add(Compound.cast(chamfer2.Shape()), mode=Mode.REPLACE)

    # Sketch28 → Cut-Extrude18 (cut, through all)
    with BuildSketch(Plane(origin=(0, 3.9, 0), x_dir=(1, 0, 0), z_dir=(0, 1, 0))):
        with Locations((-49.875699162, -0.055329084)):
            Rectangle(SKETCH28_W, SKETCH28_H)
    extrude(amount=CUT_EXTRUDE18_DEPTH, mode=Mode.SUBTRACT)


with BuildPart() as body_2_2:
    # Split1: the piece behind the surface
    add(part_1.part)
    # Split1 surface: a surface, the sketch's curves swept straight by 230.358 mm
    with BuildLine(Plane.XY.offset(12.5).offset(-SPLIT1_SURFACE_1_BACK), mode=Mode.PRIVATE) as split1_surface_1_path:
        Line((49.75, 16.919816136), (44.344439399, 16.919816136))
        Line((44.344439399, 16.919816136), (44.344439399, 5.082242234))
        Line((44.344439399, 5.082242234), (49.75, 5.082242234))
        Line((49.75, 5.082242234), (49.75, 0))
        Line((49.75, 0), (55.284430015, 0))
        Line((55.284430015, 0), (55.284430015, 16.919816136))
        Line((55.284430015, 16.919816136), (49.75, 16.919816136))
    split1_surface_1 = Shell.extrude(split1_surface_1_path.wire(), (0 * SPLIT1_SURFACE_1_DEPTH, 0 * SPLIT1_SURFACE_1_DEPTH, 1 * SPLIT1_SURFACE_1_DEPTH))
    split(bisect_by=split1_surface_1, keep=Keep.BOTTOM)


with BuildPart() as part_2:
    add(part_1.part)

    # Split1: split by a surface, the side it looks to stays
    # Split1 surface: a surface, the sketch's curves swept straight by 230.358 mm
    with BuildLine(Plane.XY.offset(12.5).offset(-SPLIT1_SURFACE_2_BACK), mode=Mode.PRIVATE) as split1_surface_2_path:
        Line((49.75, 16.919816136), (44.344439399, 16.919816136))
        Line((44.344439399, 16.919816136), (44.344439399, 5.082242234))
        Line((44.344439399, 5.082242234), (49.75, 5.082242234))
        Line((49.75, 5.082242234), (49.75, 0))
        Line((49.75, 0), (55.284430015, 0))
        Line((55.284430015, 0), (55.284430015, 16.919816136))
        Line((55.284430015, 16.919816136), (49.75, 16.919816136))
    split1_surface_2 = Shell.extrude(split1_surface_2_path.wire(), (0 * SPLIT1_SURFACE_2_DEPTH, 0 * SPLIT1_SURFACE_2_DEPTH, 1 * SPLIT1_SURFACE_2_DEPTH))
    split(bisect_by=split1_surface_2, keep=Keep.TOP)


solid = Compound([body_2_2.part, part_2.part])
